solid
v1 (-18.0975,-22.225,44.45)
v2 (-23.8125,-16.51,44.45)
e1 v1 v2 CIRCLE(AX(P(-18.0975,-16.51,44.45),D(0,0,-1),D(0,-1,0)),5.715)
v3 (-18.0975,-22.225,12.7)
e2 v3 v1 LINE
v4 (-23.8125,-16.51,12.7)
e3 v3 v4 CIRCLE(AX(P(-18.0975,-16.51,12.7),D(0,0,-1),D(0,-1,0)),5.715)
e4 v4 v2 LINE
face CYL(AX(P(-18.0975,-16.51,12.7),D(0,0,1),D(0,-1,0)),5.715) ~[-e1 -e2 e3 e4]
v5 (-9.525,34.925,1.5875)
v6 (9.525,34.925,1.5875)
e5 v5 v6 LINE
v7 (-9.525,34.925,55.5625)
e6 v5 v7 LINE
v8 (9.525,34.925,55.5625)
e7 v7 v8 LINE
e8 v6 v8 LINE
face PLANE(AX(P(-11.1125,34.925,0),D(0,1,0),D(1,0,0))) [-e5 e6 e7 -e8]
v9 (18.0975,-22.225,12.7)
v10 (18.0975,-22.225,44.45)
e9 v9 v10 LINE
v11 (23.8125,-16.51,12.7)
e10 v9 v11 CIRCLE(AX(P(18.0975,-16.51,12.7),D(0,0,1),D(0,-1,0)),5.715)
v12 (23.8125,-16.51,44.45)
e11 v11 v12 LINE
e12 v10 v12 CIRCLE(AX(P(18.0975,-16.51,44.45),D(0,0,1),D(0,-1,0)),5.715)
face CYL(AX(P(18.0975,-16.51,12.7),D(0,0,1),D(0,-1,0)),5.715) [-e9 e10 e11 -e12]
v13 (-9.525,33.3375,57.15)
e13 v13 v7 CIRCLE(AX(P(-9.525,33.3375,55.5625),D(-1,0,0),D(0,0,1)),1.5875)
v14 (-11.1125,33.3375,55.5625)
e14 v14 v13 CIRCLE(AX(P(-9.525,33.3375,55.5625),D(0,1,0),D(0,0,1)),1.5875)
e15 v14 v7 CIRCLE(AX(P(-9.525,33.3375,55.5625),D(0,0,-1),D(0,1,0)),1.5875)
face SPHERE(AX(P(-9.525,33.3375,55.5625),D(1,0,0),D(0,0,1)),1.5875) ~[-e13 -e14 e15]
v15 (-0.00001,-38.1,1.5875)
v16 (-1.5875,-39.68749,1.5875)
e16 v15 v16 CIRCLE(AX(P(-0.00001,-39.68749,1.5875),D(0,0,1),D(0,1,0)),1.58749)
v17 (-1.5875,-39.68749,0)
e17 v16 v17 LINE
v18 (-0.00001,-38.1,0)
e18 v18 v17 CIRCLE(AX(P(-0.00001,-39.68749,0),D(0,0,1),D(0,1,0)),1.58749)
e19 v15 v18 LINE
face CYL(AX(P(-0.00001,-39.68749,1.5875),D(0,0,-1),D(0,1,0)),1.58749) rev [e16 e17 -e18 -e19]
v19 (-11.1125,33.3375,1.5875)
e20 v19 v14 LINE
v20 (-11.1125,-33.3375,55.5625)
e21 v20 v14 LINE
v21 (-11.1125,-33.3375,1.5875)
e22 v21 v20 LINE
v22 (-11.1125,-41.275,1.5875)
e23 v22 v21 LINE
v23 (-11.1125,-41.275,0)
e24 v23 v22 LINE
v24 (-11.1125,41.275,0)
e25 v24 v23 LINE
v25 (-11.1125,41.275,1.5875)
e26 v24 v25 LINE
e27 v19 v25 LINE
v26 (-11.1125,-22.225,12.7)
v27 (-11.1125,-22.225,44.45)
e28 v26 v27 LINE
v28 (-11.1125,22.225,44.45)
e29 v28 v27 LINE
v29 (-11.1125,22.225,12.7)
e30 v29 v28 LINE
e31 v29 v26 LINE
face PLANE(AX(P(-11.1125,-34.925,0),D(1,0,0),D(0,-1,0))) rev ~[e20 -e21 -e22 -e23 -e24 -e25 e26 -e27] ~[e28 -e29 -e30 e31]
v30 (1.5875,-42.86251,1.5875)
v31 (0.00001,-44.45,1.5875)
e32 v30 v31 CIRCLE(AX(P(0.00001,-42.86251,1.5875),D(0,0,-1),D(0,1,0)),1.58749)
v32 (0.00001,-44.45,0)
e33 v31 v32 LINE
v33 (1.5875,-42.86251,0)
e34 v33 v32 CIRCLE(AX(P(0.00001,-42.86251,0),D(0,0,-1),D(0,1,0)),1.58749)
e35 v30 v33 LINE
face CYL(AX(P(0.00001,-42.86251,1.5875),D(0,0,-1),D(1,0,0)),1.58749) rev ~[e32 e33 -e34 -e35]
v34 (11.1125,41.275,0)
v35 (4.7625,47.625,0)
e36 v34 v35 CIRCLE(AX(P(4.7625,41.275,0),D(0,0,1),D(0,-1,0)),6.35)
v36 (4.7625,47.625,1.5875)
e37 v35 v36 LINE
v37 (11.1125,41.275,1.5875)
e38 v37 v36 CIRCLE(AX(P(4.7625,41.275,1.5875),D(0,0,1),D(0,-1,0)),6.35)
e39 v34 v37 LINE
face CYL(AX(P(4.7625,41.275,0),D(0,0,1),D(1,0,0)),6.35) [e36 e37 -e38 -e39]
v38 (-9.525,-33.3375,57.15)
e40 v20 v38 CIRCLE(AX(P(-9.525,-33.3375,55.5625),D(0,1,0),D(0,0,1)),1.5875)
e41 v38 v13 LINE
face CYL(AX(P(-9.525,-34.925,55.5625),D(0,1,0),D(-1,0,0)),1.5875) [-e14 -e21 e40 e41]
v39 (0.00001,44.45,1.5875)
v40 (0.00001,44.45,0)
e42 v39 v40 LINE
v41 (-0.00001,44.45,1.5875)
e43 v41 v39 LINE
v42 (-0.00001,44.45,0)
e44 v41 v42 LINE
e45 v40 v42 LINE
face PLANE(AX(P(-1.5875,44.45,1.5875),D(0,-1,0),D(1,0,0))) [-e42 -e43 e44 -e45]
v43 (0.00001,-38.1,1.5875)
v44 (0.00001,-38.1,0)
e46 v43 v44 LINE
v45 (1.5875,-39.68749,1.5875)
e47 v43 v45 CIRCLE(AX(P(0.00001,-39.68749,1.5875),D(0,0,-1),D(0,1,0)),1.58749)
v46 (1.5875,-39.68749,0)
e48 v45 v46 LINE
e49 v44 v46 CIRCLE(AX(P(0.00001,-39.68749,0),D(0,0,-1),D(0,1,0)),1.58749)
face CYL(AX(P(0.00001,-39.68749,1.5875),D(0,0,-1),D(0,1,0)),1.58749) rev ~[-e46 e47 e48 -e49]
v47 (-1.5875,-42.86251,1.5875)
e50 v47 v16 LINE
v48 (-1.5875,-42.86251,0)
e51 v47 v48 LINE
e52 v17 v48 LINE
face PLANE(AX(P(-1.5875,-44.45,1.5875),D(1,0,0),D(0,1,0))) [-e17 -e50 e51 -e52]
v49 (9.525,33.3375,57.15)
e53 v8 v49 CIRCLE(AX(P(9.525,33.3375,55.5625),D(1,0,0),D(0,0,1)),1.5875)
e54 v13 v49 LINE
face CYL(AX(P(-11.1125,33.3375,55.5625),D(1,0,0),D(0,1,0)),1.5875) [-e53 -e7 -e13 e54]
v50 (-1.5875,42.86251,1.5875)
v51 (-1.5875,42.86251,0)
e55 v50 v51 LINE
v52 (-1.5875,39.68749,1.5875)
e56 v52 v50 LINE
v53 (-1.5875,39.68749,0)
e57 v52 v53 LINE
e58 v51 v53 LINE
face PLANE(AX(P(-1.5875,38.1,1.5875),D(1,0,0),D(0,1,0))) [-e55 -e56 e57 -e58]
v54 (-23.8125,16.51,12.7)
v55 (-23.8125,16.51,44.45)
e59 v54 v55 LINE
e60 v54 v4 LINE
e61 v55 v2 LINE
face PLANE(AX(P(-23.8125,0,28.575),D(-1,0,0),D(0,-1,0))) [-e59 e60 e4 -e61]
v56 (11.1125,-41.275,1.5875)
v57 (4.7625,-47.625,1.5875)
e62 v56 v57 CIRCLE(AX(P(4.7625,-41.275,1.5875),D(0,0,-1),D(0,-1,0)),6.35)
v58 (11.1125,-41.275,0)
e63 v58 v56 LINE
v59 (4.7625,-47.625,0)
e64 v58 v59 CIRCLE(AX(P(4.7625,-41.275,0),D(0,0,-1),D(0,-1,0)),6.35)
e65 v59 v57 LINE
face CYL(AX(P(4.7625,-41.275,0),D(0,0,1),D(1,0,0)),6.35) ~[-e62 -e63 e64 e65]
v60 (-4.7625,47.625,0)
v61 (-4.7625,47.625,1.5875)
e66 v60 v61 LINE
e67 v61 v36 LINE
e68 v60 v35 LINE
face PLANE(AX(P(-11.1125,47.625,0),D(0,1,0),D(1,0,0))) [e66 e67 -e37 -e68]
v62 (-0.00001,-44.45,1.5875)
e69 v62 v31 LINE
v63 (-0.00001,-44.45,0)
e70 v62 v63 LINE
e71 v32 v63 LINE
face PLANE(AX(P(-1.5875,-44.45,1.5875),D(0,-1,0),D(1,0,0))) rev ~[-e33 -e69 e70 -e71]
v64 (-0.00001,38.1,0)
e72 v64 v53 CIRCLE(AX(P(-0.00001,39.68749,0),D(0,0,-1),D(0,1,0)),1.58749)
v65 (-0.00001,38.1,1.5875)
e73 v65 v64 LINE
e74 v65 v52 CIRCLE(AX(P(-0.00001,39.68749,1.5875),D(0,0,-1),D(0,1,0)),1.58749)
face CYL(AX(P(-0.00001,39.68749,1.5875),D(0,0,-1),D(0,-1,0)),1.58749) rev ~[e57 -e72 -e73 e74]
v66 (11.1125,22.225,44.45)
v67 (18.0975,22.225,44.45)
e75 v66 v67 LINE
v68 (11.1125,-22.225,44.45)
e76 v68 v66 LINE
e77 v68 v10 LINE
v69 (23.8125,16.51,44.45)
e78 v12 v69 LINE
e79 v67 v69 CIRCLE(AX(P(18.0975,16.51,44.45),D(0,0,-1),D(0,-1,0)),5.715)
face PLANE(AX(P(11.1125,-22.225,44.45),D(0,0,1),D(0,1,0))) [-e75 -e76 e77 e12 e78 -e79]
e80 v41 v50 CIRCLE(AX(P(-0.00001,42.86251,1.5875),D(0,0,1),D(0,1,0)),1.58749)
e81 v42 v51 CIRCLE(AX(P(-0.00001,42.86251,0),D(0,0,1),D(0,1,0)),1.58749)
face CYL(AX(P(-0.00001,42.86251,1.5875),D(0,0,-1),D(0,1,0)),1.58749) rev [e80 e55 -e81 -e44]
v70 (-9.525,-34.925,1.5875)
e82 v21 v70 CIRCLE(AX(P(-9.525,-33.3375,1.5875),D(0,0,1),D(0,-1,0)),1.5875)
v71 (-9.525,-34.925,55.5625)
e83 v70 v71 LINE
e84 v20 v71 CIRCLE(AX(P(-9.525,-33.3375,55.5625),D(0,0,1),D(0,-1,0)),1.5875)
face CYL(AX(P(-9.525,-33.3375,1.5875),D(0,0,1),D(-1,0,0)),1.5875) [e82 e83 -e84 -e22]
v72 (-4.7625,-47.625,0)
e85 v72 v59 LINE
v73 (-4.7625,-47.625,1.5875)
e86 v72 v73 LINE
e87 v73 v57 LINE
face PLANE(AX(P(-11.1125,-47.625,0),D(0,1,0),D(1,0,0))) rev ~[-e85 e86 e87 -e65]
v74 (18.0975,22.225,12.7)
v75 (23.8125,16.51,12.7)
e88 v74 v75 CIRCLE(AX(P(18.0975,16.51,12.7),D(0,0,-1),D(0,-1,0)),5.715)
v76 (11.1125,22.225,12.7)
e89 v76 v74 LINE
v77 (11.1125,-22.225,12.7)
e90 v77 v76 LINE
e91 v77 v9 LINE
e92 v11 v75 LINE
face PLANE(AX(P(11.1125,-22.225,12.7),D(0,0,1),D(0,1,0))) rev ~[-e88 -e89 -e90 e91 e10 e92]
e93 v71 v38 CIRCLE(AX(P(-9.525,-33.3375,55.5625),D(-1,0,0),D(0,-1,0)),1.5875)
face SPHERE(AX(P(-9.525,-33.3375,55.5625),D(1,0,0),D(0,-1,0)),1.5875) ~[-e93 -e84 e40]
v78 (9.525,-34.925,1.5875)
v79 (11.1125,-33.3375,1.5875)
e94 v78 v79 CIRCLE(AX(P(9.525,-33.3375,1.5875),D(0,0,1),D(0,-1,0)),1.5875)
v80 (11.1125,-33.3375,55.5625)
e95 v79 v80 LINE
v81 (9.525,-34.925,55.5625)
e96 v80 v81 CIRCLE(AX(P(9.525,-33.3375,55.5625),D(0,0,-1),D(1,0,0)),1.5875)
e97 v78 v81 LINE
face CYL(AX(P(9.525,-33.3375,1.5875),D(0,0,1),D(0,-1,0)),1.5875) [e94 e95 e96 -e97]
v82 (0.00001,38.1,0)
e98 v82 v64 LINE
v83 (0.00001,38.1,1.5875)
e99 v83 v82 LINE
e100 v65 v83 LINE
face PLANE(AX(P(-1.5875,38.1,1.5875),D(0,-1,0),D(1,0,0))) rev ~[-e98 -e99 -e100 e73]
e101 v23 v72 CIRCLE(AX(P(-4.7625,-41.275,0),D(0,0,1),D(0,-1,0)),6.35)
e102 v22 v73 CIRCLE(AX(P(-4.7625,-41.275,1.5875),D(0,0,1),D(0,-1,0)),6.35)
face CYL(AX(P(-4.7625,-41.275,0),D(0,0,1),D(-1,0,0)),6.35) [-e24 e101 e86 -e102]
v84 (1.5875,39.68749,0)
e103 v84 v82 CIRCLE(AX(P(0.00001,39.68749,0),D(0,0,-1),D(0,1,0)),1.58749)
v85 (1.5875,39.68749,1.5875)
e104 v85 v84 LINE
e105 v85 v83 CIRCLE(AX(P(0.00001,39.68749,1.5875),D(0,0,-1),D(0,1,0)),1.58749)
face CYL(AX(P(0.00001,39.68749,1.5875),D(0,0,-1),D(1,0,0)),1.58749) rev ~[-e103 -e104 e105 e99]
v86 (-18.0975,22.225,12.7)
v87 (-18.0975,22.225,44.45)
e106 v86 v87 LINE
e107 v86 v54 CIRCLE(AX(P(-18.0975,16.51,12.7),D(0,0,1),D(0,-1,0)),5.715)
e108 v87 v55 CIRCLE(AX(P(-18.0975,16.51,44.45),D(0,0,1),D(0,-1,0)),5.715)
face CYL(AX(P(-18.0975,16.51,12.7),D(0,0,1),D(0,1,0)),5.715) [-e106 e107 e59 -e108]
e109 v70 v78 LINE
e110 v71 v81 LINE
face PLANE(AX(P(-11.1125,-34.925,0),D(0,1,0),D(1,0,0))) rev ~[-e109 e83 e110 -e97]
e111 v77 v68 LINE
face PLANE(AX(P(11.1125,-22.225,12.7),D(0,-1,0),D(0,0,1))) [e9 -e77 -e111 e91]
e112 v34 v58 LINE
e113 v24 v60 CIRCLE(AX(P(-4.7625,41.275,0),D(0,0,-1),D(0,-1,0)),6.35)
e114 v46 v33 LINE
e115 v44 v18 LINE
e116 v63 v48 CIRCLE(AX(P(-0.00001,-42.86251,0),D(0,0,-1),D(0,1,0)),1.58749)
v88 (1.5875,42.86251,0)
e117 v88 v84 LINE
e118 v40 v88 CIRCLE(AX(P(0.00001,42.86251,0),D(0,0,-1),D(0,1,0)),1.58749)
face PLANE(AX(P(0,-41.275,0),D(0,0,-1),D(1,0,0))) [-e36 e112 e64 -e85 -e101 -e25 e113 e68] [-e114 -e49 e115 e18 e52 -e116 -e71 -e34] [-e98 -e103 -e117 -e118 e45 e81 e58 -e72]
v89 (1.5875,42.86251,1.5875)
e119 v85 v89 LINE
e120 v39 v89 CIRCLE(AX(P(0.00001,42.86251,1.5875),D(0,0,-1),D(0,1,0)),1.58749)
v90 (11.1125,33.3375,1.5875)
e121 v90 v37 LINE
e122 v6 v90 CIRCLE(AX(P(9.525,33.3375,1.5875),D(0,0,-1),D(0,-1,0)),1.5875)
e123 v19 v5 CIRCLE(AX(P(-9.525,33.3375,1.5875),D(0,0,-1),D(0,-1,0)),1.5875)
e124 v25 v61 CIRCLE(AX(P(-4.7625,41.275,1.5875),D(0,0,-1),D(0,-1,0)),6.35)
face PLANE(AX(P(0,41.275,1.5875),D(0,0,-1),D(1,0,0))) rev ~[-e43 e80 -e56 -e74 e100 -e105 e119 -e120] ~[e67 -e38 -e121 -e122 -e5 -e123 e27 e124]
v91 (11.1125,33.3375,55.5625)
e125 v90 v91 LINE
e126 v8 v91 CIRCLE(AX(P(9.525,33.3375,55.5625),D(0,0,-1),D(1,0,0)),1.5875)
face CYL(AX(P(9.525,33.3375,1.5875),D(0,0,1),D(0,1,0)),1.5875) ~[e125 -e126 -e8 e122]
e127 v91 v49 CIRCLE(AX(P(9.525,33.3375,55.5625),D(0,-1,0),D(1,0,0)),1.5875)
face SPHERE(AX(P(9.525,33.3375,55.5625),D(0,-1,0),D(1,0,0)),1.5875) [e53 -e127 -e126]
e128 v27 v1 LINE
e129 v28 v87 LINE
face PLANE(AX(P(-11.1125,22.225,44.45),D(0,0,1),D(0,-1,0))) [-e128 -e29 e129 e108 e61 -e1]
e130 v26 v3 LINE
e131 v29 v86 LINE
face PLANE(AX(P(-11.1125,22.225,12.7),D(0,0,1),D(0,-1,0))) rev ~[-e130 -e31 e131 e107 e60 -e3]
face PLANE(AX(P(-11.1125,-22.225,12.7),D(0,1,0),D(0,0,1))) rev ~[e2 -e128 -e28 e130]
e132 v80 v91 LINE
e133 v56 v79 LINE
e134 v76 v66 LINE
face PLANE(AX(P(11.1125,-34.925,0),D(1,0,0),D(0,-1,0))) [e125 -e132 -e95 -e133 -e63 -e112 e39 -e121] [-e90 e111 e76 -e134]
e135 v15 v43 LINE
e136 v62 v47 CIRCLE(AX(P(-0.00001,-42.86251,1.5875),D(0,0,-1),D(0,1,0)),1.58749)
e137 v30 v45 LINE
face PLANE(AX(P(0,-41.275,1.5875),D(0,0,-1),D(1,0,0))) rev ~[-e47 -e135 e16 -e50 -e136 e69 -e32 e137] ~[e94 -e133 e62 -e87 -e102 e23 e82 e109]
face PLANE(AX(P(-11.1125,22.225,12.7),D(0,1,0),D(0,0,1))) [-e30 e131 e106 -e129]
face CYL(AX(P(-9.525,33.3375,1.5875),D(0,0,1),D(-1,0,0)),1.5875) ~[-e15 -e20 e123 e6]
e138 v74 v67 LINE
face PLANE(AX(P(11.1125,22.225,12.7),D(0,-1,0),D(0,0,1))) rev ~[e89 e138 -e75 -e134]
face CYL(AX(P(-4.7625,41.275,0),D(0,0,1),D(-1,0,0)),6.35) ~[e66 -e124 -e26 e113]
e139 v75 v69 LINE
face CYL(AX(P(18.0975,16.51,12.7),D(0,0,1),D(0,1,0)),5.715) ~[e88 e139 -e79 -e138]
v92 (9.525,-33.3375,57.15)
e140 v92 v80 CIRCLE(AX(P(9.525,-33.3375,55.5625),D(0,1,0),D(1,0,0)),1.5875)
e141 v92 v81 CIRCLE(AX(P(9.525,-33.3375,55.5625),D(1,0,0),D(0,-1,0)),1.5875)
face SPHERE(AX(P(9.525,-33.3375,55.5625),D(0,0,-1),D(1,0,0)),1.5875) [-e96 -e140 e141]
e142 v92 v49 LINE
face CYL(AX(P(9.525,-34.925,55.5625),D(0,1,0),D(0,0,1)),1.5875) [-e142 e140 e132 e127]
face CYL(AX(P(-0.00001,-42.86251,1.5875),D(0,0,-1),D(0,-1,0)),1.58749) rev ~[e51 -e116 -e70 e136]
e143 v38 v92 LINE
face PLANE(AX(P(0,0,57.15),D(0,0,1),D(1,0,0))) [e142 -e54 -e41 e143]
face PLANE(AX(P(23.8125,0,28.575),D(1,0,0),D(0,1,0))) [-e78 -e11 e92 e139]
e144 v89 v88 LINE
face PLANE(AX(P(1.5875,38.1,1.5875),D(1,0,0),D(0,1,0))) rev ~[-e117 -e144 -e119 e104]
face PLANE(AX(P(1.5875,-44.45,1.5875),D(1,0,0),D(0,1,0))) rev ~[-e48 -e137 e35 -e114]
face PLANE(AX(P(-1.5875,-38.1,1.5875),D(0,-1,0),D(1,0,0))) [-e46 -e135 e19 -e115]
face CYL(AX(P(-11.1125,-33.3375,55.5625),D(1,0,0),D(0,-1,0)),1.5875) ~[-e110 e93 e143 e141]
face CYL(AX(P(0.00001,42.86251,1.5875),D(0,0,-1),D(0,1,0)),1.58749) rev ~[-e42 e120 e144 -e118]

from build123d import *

# Parameters (mm, degrees)
F0_W      = 22.225
F0_H      = 69.85
F1_DEPTH  = 57.15
F2_W      = 22.225
F2_H      = 12.7
F3_DEPTH  = 1.5875
F4_R      = 6.35
F5_W      = 3.175
F5_H      = 6.35
F6_DEPTH  = 25.4
F7_R      = 1.58749
F8_W      = 44.45
F8_H      = 31.75
F10_DEPTH = 12.7
F9_W      = 44.45
F9_H      = 31.75
F11_DEPTH = 12.7
F12_R     = 5.715
F13_R     = 1.5875


# Not quite as in the source:
# - a fillet or chamfer is up to 0.001 mm smaller than in the source, because OpenCascade refuses the exact size


with BuildPart() as f1:
    # F0 (on Top) → F1 (new body)
    with BuildSketch(Plane.XY):
        Rectangle(F0_W, F0_H)
    extrude(amount=F1_DEPTH)

    # F2 (on face) → F3 (join)
    with BuildSketch(Plane(origin=(0, 0, 0), x_dir=(1, 0, 0), z_dir=(0, 0, -1))):
        with Locations((0, 41.275)):
            Rectangle(F2_W, F2_H)
        with Locations((0, -41.275)):
            Rectangle(F2_W, F2_H)
    extrude(amount=-F3_DEPTH)

    # F4
    f4_edges = [f1.edges().sort_by_distance(p)[0] for p in [
        (-11.1125, -47.625, 0.79375),
        (11.1125, -47.625, 0.79375),
        (-11.1125, 47.625, 0.79375),
        (11.1125, 47.625, 0.79375),
    ]]
    fillet(f4_edges, radius=F4_R)

    # F5 (on face) → F6 (cut)
    with BuildSketch(Plane.XY.offset(1.5875)):
        with Locations((0, 41.275)):
            Rectangle(F5_W, F5_H)
        with Locations((0, -41.275)):
            Rectangle(F5_W, F5_H)
    extrude(amount=-F6_DEPTH, mode=Mode.SUBTRACT)

    # F7 (radius 1.5875 in the source; OpenCascade refuses exactly that, so slightly less here)
    f7_edges = [f1.edges().sort_by_distance(p)[0] for p in [
        (1.5875, 44.45, 0.79375),
        (-1.5875, 44.45, 0.79375),
        (-1.5875, 38.1, 0.79375),
        (1.5875, 38.1, 0.79375),
        (1.5875, -38.1, 0.79375),
        (-1.5875, -38.1, 0.79375),
        (-1.5875, -44.45, 0.79375),
        (1.5875, -44.45, 0.79375),
    ]]
    fillet(f7_edges, radius=F7_R)

    # F8 (on face) → F10 (join)
    with BuildSketch(Plane.YZ.offset(11.1125)):
        with Locations((0, 28.575)):
            Rectangle(F8_W, F8_H)
    extrude(amount=F10_DEPTH)

    # F9 (on face) → F11 (join)
    with BuildSketch(Plane(origin=(-11.1125, 0, 0), x_dir=(0, -1, 0), z_dir=(-1, 0, 0))):
        with Locations((0, 28.575)):
            Rectangle(F9_W, F9_H)
    extrude(amount=F11_DEPTH)

    # F12
    f12_edges = [f1.edges().sort_by_distance(p)[0] for p in [
        (23.8125, -22.225, 28.575),
        (23.8125, 22.225, 28.575),
        (-23.8125, -22.225, 28.575),
        (-23.8125, 22.225, 28.575),
    ]]
    fillet(f12_edges, radius=F12_R)

    # F13
    f13_edges = [f1.edges().sort_by_distance(p)[0] for p in [
        (11.1125, -34.925, 29.36875),
        (11.1125, 0, 57.15),
        (11.1125, 34.925, 29.36875),
        (0, -34.925, 57.15),
        (0, 34.925, 57.15),
        (-11.1125, -34.925, 29.36875),
        (-11.1125, 0, 57.15),
        (-11.1125, 34.925, 29.36875),
    ]]
    fillet(f13_edges, radius=F13_R)


solid = f1.part
